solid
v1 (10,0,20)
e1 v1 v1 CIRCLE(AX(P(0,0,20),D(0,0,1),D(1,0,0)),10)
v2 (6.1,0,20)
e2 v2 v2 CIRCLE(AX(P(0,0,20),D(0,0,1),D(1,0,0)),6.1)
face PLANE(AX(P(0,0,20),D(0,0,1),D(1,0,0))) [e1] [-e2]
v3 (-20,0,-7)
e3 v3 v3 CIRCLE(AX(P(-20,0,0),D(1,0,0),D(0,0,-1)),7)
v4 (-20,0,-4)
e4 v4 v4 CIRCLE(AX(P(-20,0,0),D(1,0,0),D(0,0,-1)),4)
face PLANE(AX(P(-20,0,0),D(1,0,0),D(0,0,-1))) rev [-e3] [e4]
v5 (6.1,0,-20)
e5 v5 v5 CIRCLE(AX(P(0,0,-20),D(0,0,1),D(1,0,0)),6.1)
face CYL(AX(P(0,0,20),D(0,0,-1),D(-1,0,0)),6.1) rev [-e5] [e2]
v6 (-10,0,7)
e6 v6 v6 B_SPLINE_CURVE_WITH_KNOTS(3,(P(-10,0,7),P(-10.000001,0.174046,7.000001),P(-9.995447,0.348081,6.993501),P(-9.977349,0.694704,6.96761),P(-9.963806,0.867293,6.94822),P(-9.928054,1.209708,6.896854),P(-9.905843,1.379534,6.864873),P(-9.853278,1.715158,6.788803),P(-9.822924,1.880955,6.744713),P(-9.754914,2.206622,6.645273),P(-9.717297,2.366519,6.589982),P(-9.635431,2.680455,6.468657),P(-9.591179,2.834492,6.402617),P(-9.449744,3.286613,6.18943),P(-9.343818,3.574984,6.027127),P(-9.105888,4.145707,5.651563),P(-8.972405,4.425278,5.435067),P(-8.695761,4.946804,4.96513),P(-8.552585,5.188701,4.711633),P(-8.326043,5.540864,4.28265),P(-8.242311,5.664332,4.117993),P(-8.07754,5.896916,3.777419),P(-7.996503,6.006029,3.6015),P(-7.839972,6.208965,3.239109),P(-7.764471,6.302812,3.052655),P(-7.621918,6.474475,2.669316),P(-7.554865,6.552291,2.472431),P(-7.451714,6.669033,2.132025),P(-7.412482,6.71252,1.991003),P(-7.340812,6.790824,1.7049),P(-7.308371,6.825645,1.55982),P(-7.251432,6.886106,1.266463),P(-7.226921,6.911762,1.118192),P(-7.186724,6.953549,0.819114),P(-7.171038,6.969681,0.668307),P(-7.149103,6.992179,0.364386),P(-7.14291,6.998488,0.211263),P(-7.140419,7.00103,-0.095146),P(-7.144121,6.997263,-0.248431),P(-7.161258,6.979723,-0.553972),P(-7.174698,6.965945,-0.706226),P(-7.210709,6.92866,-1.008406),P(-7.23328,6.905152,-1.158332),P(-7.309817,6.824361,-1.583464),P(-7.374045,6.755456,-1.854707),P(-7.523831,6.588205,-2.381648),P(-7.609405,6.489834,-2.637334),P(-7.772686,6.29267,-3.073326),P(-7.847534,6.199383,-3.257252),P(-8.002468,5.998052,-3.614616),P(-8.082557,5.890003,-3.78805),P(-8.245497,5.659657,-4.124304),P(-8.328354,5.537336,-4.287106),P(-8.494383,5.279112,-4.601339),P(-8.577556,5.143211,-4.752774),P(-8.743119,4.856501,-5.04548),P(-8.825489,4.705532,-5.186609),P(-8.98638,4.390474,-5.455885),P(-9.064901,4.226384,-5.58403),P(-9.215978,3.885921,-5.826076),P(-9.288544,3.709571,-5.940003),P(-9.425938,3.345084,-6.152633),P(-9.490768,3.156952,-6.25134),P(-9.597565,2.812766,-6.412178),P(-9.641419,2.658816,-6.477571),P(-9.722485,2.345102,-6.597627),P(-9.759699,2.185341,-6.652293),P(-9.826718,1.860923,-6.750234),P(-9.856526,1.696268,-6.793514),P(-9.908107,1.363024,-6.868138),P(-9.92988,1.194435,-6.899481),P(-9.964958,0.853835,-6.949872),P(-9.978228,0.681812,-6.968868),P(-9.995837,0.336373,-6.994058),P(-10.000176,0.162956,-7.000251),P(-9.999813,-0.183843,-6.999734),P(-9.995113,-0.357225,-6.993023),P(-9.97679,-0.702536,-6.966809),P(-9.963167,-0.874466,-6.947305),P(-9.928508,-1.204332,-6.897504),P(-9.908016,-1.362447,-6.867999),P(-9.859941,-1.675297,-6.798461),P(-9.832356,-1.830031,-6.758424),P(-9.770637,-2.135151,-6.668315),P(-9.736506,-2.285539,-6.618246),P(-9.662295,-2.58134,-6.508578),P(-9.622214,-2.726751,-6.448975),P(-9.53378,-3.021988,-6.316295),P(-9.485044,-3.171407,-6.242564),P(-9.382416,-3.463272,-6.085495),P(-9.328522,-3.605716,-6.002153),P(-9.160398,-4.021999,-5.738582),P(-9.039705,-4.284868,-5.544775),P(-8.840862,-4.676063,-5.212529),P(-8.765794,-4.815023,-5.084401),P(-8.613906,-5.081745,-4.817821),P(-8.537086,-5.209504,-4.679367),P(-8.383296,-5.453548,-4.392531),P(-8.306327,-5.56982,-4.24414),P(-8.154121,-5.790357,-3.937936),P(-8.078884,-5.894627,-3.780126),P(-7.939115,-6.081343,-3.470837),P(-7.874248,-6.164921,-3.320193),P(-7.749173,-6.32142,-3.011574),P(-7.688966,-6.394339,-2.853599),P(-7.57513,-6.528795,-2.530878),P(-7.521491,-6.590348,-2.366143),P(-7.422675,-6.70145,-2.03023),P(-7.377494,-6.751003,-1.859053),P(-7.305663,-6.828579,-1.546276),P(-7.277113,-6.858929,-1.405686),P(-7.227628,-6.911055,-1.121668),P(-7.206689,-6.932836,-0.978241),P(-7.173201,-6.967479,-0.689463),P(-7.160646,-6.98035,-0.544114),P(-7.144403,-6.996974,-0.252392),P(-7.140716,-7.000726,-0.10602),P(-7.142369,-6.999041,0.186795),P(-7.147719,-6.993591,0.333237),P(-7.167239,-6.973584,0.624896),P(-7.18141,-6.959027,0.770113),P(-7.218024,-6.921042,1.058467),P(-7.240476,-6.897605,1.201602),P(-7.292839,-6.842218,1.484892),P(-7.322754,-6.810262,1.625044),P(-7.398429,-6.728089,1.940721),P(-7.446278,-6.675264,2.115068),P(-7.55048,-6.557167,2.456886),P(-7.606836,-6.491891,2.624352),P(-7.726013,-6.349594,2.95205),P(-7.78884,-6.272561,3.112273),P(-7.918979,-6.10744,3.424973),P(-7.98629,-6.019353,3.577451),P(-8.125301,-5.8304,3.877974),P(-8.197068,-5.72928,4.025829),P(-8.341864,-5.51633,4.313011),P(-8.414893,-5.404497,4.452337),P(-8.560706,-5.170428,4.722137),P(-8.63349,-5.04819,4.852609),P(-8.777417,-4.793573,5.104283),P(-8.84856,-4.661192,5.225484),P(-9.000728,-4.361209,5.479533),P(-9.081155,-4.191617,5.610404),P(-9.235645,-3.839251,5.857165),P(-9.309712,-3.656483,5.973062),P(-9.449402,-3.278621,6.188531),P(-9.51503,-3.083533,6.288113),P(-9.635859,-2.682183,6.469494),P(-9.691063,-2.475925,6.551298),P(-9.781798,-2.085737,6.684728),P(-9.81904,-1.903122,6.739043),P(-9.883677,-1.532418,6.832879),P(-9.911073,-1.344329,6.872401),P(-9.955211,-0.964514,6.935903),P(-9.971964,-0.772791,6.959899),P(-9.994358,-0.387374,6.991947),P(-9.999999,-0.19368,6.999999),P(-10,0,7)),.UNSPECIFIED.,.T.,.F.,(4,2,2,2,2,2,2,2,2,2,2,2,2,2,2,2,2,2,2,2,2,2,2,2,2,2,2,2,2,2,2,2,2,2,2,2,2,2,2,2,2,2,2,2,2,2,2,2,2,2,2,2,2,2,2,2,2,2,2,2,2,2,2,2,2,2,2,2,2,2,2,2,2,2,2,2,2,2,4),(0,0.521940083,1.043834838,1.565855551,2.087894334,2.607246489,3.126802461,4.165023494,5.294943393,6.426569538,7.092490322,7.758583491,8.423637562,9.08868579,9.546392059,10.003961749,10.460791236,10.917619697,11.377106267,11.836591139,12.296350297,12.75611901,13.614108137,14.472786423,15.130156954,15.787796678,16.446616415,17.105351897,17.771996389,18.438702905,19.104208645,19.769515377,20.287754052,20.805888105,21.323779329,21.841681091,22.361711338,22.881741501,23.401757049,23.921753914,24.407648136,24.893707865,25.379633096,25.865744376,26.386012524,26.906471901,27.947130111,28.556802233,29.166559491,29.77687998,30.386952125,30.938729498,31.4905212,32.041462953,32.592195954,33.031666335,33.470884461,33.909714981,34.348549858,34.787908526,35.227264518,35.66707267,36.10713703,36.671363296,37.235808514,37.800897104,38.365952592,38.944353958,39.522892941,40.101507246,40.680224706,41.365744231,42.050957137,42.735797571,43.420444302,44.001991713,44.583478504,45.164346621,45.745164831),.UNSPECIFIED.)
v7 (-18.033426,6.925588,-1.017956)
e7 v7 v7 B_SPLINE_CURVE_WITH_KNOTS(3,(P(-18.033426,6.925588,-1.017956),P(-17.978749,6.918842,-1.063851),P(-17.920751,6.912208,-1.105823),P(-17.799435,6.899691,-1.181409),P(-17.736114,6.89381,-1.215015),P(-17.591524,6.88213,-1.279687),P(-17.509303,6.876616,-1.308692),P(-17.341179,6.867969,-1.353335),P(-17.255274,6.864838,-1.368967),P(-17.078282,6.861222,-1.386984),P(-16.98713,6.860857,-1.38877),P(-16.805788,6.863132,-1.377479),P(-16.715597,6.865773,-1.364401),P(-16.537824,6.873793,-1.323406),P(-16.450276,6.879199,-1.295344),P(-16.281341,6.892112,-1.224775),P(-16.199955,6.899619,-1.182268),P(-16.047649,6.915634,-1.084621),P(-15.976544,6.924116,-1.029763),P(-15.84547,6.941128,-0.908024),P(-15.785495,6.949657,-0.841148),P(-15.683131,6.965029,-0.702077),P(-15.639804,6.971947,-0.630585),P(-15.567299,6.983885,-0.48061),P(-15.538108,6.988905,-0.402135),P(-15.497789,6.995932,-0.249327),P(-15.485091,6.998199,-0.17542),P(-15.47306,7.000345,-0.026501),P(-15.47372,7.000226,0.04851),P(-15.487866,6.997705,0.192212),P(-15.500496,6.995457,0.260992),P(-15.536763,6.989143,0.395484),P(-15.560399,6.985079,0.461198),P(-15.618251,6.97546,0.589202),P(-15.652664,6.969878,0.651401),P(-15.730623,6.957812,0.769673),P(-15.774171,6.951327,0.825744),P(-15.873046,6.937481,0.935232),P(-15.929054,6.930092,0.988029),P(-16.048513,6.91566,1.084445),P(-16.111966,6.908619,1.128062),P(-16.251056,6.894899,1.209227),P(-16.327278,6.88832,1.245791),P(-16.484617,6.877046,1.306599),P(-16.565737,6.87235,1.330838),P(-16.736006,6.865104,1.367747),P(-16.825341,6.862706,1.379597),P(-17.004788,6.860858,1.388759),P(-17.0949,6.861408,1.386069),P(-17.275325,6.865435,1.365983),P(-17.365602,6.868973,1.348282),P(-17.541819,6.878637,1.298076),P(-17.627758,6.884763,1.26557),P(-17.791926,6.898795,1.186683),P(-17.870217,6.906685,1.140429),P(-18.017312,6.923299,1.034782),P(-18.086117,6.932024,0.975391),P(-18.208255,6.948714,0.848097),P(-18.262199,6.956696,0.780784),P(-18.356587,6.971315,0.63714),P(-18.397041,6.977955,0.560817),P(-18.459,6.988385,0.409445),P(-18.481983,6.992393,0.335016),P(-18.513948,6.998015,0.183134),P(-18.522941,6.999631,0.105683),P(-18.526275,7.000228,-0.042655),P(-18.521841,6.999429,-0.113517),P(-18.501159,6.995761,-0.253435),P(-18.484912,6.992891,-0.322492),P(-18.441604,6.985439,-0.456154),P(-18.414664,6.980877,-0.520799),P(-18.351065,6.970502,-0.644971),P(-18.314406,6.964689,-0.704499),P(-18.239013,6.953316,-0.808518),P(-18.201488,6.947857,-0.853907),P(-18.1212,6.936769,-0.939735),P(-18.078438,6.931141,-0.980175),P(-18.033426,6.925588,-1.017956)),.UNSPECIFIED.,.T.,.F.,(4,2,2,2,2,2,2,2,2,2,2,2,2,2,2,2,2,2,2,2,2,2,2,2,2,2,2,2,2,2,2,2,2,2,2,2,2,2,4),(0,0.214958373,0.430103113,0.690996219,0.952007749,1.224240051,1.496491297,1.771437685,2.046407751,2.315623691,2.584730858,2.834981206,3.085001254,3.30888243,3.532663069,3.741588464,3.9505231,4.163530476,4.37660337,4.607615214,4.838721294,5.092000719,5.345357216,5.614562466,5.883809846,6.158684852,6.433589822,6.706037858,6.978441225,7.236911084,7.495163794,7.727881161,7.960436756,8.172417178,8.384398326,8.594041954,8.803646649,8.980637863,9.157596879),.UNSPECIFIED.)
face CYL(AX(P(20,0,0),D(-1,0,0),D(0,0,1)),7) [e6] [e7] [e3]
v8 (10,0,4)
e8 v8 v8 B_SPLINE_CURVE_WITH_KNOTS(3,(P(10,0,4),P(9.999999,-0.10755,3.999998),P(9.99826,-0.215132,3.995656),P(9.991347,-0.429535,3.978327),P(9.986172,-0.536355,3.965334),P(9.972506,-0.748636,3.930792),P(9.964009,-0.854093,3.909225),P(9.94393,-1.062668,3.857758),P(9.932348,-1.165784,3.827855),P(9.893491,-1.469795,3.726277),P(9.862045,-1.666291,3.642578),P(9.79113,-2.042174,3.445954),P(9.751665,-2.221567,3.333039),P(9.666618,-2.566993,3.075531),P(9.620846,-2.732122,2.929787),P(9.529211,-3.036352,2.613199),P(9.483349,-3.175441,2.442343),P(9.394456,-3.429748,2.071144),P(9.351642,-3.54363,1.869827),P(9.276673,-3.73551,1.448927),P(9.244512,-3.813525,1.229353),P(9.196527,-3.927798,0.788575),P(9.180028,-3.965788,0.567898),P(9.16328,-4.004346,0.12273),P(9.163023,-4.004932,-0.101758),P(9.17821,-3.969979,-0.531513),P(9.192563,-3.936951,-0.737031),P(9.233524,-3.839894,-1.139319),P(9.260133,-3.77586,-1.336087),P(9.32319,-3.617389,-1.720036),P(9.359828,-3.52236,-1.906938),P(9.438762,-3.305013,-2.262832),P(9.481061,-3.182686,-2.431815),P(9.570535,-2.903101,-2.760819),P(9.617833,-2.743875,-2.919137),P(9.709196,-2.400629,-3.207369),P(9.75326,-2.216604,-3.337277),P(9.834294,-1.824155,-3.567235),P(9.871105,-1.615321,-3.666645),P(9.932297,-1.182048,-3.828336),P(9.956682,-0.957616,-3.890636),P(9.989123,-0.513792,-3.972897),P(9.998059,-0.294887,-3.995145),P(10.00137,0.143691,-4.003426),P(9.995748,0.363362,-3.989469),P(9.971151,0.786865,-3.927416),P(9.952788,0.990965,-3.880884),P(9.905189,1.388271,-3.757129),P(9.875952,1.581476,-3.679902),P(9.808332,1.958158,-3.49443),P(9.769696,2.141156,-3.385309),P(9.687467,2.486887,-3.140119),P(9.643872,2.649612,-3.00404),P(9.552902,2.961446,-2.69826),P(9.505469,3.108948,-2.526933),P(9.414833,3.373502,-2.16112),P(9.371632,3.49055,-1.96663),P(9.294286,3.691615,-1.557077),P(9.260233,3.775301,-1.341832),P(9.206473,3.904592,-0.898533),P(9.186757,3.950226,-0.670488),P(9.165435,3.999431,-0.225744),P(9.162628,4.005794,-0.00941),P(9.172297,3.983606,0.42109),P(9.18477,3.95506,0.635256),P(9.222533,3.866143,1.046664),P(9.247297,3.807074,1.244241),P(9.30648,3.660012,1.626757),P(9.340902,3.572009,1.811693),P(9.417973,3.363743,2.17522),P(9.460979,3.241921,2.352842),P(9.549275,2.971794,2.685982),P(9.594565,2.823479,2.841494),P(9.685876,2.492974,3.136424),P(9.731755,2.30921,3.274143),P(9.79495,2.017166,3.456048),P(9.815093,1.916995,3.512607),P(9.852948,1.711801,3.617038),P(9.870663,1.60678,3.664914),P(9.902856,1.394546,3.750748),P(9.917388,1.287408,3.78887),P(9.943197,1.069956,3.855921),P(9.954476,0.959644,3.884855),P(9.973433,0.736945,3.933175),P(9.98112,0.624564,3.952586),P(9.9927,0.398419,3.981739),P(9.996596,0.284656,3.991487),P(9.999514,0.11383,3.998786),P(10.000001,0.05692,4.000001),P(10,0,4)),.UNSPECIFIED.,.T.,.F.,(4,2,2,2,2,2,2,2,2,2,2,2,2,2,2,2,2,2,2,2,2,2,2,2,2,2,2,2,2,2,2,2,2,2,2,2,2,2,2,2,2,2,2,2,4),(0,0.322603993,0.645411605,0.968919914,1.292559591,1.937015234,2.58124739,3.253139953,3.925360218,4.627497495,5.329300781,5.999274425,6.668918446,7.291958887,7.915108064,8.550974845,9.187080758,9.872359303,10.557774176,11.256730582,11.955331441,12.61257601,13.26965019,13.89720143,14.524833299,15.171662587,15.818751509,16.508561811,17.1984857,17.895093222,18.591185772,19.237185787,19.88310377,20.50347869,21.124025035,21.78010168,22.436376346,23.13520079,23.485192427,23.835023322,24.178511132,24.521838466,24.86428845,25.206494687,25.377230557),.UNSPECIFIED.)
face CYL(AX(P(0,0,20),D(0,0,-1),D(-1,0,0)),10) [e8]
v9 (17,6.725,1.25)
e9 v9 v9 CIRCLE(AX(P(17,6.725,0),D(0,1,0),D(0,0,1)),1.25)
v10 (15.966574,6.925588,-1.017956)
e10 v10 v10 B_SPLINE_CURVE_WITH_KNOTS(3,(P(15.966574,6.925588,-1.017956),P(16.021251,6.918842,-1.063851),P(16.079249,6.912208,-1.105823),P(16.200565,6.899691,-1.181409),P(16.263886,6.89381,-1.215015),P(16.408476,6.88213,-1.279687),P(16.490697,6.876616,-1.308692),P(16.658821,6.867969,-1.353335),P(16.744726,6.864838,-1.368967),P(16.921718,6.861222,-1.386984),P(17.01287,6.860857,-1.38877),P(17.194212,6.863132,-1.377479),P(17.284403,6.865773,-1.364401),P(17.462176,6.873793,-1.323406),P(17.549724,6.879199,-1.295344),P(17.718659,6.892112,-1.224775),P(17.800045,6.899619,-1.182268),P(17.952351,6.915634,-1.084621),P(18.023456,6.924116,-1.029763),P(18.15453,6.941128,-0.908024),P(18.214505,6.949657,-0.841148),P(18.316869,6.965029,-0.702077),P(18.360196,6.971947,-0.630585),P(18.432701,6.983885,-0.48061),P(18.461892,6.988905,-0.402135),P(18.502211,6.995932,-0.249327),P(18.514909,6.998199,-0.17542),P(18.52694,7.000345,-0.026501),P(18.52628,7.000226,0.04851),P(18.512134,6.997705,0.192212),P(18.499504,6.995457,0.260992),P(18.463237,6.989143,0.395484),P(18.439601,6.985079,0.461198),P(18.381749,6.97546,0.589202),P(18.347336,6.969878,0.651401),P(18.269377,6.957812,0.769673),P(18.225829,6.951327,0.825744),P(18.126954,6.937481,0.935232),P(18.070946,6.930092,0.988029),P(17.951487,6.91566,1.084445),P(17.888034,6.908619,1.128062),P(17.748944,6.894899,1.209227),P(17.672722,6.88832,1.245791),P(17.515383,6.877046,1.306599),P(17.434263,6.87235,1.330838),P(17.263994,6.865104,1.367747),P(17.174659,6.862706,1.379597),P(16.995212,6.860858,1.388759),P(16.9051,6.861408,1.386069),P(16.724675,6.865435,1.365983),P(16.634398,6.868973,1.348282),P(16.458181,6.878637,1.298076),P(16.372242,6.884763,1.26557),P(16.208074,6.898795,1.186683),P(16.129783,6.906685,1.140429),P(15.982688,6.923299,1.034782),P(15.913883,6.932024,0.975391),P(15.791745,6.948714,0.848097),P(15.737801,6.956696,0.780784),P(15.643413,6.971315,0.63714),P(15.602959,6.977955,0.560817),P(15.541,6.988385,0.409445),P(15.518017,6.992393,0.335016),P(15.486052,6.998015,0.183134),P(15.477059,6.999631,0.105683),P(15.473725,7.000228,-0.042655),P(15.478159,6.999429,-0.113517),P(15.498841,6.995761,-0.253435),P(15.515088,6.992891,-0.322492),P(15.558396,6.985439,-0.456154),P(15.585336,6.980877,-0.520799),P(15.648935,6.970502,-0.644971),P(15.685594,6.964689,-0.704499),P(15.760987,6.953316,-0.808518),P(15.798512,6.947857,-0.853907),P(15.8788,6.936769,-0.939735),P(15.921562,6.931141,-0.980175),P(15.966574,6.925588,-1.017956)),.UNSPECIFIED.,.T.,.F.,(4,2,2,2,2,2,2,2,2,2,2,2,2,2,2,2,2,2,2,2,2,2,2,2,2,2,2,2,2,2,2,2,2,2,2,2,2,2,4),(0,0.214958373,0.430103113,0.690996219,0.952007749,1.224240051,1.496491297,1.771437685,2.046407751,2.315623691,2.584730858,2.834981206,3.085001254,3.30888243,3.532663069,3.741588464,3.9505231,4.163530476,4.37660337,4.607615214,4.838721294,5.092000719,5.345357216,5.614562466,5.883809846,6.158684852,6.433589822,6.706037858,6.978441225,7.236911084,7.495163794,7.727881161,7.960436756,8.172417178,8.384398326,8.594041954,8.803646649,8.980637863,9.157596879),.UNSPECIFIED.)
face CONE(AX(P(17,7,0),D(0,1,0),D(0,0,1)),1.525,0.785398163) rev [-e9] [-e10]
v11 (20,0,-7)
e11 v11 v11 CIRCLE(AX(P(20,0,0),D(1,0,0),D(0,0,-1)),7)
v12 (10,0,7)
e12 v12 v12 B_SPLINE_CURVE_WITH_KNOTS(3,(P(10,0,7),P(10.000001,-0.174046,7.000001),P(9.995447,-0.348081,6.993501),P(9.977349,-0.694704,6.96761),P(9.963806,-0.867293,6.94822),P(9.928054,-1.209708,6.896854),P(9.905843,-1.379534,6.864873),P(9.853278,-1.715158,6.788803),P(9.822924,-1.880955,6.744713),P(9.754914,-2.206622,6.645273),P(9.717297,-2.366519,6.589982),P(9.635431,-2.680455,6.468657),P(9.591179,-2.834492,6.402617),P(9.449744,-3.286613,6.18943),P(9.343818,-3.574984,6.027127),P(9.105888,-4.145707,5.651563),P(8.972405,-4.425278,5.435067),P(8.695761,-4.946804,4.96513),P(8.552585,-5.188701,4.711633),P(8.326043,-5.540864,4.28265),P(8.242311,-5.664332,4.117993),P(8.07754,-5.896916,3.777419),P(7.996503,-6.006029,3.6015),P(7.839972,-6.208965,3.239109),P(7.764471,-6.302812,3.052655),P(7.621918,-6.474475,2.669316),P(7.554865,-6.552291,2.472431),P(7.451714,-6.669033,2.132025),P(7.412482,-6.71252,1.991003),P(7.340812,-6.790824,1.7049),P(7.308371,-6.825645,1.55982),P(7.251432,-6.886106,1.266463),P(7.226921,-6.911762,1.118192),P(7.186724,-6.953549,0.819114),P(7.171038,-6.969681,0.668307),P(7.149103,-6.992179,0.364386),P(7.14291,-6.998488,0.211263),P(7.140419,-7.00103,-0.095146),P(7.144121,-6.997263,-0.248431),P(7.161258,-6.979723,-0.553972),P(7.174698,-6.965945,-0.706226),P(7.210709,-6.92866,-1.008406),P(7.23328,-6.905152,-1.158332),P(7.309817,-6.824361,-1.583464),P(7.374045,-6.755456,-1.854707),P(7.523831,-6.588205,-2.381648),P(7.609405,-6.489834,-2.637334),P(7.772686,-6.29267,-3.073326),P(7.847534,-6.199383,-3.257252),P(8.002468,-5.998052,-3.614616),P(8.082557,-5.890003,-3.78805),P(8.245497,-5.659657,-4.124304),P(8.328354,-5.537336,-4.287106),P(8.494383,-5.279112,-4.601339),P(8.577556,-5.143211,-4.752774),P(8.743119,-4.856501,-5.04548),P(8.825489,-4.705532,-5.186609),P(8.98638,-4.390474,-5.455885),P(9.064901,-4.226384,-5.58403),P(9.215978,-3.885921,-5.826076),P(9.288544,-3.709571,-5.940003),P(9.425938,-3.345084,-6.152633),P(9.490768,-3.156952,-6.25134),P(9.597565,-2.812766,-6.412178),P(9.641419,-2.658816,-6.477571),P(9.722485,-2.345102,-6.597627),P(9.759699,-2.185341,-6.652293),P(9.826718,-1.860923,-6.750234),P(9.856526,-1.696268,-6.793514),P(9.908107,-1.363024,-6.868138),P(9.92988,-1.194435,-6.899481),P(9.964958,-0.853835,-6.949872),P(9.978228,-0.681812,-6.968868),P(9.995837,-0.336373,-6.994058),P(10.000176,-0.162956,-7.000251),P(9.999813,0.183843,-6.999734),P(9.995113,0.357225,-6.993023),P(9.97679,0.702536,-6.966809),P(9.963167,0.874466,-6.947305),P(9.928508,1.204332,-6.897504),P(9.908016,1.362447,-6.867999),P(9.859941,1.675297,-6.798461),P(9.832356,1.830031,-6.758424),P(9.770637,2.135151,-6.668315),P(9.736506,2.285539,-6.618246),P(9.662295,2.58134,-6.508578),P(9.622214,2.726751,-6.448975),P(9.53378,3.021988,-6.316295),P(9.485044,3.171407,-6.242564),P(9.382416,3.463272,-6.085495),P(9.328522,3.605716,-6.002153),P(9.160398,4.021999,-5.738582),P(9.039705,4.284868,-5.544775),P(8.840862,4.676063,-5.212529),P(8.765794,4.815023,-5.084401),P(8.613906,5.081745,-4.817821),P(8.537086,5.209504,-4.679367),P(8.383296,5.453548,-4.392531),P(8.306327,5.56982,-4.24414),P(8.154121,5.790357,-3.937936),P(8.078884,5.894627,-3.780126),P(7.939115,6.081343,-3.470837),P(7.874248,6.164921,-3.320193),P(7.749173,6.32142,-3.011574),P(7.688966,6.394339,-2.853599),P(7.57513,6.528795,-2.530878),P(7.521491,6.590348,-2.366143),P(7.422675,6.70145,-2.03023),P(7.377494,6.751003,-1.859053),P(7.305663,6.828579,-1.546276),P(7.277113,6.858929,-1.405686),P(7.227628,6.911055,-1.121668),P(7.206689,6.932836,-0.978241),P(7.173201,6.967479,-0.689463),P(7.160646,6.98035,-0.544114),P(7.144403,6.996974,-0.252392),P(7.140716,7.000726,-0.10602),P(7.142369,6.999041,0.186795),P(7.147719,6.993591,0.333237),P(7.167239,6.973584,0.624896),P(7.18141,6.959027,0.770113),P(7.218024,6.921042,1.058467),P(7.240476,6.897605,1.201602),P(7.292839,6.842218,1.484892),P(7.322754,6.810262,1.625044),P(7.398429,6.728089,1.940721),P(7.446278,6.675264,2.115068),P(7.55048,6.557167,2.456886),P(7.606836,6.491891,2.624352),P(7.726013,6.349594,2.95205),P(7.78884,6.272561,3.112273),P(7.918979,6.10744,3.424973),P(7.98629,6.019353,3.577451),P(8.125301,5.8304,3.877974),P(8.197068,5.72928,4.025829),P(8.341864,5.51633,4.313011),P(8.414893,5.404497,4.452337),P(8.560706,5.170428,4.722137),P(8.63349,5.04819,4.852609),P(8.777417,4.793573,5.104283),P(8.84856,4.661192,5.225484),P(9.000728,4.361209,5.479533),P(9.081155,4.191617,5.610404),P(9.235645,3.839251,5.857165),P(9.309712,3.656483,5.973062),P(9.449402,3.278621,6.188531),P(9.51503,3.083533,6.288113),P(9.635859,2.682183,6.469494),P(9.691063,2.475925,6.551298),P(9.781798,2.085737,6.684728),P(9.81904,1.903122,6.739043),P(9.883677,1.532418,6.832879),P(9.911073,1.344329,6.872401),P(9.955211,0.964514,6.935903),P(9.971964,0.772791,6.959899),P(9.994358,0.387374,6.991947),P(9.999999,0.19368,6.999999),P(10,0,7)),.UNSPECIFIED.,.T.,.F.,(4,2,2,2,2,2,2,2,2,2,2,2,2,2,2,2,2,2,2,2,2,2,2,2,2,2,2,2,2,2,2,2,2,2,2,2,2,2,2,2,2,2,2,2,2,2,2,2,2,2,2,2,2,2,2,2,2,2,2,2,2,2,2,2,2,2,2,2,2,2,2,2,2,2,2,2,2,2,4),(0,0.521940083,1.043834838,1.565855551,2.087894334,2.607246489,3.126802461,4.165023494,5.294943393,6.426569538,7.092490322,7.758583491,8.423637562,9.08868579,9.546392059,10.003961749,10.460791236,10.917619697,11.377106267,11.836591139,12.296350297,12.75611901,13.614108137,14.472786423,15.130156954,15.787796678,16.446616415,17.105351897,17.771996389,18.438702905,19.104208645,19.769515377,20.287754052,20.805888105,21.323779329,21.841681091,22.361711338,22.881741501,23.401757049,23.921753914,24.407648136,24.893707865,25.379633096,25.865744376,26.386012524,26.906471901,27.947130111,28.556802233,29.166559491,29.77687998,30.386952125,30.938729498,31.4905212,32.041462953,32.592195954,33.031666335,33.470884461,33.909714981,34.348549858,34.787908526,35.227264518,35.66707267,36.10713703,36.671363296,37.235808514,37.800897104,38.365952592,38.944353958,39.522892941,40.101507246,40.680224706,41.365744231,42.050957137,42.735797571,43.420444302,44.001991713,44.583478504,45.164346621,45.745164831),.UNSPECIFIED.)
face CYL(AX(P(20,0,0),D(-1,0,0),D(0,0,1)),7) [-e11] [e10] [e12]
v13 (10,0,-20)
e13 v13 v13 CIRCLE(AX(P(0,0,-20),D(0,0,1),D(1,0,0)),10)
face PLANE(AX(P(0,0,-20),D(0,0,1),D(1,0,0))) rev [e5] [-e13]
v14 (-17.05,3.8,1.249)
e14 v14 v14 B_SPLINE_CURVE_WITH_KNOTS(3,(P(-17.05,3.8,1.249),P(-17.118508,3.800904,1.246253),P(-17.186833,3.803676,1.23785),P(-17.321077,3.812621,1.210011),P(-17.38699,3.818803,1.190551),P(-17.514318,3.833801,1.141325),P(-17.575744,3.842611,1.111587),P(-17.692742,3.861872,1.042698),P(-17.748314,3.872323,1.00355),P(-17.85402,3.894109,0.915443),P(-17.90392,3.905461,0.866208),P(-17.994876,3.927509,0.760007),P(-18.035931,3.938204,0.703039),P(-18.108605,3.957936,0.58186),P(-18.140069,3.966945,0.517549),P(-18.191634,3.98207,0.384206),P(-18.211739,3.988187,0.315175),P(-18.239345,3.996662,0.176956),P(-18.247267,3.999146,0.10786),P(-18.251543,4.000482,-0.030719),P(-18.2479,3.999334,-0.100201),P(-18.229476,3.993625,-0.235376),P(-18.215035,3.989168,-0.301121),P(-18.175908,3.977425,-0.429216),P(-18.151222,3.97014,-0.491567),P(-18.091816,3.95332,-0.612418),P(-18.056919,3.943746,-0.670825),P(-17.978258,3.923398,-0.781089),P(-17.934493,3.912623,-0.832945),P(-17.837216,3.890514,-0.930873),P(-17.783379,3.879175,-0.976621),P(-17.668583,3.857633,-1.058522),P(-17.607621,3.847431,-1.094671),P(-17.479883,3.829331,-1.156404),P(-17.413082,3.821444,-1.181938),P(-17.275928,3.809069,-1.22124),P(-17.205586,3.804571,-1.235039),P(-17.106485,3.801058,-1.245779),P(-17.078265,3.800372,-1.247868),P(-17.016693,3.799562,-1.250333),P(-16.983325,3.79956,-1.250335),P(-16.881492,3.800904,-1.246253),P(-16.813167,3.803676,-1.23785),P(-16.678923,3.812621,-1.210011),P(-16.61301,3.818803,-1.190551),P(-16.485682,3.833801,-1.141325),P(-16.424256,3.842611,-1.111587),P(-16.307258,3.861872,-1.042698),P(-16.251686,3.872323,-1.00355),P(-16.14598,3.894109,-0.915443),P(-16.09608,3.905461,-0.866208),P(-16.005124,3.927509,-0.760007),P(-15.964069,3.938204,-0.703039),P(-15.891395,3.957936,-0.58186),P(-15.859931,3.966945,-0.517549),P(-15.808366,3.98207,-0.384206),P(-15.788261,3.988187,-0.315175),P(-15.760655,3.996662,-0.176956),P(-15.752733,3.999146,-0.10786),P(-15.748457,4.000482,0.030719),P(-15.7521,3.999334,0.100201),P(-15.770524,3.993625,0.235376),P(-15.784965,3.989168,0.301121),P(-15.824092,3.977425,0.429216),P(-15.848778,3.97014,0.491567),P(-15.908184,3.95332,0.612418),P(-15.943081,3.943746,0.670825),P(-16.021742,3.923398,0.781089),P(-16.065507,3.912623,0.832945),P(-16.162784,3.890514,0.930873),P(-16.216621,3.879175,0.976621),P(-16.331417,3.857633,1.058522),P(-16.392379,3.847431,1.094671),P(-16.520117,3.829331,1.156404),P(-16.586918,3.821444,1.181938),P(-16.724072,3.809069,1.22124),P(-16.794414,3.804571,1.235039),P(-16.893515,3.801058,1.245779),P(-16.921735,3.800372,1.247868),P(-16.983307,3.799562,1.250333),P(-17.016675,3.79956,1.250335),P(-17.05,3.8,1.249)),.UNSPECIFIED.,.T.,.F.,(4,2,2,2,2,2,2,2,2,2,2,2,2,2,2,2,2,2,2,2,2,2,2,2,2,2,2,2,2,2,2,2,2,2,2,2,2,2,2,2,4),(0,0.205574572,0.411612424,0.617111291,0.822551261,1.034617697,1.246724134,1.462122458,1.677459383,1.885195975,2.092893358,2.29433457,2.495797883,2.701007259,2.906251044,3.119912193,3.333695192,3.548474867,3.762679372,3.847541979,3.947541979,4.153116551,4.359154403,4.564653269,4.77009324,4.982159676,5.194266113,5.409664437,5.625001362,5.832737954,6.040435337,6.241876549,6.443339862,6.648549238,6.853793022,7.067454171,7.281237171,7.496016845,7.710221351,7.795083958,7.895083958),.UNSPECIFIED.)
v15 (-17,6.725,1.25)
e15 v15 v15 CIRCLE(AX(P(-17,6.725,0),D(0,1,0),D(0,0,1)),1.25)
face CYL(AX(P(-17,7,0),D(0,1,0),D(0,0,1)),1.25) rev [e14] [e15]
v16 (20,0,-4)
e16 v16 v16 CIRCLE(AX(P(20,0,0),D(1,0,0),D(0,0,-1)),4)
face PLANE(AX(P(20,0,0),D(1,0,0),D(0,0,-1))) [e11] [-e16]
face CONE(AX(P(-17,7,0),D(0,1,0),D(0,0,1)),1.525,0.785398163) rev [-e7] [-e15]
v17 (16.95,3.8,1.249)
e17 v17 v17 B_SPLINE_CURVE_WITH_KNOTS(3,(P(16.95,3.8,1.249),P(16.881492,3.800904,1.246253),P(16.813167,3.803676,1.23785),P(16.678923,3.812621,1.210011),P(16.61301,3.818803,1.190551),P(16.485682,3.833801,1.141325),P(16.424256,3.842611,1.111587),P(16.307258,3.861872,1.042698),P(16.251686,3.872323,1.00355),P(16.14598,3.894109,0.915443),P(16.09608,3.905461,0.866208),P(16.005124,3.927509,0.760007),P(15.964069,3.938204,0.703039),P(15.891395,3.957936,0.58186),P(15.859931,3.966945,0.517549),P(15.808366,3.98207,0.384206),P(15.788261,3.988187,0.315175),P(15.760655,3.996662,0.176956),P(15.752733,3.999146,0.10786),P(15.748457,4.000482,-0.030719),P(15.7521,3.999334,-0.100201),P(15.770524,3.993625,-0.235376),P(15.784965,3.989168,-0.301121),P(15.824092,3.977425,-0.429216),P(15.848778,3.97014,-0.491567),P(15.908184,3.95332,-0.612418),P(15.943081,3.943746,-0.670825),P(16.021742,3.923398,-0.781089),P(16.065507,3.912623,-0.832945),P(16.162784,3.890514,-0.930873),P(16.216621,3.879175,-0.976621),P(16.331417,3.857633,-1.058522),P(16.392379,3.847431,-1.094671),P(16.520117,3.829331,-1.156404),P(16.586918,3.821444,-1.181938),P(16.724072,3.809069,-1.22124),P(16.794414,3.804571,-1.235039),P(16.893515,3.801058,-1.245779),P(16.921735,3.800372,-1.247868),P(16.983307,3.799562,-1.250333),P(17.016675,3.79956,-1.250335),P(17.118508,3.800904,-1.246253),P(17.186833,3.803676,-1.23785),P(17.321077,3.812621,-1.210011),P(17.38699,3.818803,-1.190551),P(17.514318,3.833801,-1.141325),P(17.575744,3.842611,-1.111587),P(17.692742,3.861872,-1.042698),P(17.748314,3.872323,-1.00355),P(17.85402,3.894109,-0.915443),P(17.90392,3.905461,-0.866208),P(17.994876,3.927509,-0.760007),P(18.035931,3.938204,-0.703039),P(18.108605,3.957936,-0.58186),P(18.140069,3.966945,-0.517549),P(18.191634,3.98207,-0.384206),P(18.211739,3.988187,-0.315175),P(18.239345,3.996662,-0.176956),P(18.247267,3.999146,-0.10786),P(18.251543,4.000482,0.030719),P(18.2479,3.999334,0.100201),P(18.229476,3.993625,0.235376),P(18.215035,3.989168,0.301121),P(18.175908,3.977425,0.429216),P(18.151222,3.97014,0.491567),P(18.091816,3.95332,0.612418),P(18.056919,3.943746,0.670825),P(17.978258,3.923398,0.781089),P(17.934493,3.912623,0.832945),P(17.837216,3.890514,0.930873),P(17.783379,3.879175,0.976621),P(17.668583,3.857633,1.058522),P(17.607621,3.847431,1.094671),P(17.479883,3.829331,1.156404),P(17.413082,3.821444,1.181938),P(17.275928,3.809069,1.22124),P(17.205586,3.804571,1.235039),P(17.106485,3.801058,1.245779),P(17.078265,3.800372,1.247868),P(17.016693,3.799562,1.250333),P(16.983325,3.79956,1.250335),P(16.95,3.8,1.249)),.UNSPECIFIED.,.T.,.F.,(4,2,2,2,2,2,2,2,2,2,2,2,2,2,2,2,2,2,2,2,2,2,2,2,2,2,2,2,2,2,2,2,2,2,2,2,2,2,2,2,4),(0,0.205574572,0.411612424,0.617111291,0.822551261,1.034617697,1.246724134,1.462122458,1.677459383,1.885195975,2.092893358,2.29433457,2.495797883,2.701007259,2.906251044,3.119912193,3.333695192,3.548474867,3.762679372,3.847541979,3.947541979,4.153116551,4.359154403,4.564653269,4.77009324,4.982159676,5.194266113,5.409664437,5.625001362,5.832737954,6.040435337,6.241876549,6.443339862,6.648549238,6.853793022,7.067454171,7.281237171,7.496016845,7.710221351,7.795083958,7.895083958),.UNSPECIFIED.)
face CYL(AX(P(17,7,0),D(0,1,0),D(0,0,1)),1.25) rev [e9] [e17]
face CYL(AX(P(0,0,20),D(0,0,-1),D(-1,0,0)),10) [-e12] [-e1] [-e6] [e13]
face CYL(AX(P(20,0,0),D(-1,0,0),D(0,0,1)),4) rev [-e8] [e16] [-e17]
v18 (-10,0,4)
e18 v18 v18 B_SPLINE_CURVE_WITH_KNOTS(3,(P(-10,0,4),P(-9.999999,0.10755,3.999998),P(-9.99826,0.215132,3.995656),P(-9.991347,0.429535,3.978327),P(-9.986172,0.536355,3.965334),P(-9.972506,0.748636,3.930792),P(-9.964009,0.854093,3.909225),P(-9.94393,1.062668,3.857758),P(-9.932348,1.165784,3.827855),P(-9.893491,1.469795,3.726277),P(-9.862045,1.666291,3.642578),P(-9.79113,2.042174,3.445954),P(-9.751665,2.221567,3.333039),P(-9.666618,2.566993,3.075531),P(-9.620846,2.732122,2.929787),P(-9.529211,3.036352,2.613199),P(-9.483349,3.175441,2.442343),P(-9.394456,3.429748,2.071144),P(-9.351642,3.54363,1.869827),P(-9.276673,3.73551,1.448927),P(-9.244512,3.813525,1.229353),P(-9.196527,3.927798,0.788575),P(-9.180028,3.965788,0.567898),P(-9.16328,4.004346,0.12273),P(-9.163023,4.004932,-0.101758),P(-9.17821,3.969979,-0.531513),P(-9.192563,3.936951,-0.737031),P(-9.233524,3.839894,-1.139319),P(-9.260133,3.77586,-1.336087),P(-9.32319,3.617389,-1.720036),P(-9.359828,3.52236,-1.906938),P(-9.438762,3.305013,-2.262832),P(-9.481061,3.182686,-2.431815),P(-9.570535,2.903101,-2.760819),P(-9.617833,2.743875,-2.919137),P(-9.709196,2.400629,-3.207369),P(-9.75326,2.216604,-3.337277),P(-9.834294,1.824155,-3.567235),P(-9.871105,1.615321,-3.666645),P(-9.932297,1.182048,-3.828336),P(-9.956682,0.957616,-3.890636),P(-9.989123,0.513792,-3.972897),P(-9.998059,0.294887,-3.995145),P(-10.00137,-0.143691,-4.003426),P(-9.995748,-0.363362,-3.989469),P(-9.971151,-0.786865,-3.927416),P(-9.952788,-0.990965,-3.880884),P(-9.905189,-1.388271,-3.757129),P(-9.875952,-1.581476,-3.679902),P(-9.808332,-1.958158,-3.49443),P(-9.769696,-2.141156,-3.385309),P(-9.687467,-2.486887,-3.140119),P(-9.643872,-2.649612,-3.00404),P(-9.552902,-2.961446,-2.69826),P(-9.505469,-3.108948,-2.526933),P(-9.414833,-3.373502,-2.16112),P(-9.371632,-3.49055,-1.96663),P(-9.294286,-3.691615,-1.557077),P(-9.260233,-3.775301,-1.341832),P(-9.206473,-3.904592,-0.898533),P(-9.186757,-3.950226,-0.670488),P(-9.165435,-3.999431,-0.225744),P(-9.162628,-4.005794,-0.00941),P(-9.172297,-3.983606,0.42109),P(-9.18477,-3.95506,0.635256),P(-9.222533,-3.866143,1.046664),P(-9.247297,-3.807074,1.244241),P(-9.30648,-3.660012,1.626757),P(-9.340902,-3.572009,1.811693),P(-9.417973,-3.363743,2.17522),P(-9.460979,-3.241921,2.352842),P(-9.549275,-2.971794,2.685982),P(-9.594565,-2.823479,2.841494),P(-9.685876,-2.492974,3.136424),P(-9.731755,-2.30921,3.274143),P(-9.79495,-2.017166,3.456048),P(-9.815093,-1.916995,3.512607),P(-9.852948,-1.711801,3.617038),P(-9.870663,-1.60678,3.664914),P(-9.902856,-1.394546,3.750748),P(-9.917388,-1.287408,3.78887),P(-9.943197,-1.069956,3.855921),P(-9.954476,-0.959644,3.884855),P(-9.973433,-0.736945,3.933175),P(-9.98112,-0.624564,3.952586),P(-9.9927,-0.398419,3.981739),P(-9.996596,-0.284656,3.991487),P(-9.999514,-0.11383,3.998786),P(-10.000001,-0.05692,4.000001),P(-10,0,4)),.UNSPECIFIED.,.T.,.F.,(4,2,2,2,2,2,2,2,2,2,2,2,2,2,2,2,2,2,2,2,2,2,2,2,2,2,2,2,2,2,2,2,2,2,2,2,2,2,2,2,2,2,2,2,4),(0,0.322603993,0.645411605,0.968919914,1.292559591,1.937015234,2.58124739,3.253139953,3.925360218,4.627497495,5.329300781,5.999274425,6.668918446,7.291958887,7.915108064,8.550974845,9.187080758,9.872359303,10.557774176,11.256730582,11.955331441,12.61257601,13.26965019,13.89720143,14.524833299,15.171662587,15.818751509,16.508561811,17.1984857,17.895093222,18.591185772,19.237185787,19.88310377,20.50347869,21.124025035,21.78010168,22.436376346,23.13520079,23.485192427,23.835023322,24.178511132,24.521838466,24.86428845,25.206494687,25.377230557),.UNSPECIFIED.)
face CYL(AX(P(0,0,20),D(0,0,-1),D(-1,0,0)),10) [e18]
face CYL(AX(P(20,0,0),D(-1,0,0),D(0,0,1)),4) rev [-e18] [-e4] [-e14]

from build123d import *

# Parameters (mm, degrees)
SKETCH1_R               = 10
SKETCH1_R_2             = 6.1
BOSS_EXTRUDE1_DEPTH     = 20
SKETCH2_R               = 7
SKETCH2_R_2             = 4
BOSS_EXTRUDE2_DEPTH     = 20
CUT_EXTRUDE1_DEPTH      = 31.000000167
CUT_EXTRUDE1_DEPTH_BACK = 31.000000167
SKETCH5_R               = 6.1


# Read off the part's stored shape, not the designer's step: M3 Tapped Hole1
with BuildPart() as part:
    # Sketch1 → Boss-Extrude1 (new, symmetric)
    with BuildSketch(Plane.XY):
        Circle(SKETCH1_R)
        Circle(SKETCH1_R_2, mode=Mode.SUBTRACT)
    extrude(amount=BOSS_EXTRUDE1_DEPTH, both=True)

    # Sketch2 → Boss-Extrude2 (add, symmetric)
    with BuildSketch(Plane(origin=(0, 0, 0), x_dir=(0, 0, -1), z_dir=(1, 0, 0))):
        Circle(SKETCH2_R)
        with Locations(Location((0, 0, 0), (0, 0, 180))):
            Circle(SKETCH2_R_2, mode=Mode.SUBTRACT)
    extrude(amount=BOSS_EXTRUDE2_DEPTH, both=True)

    # M3 Tapped Hole1 outline → M3 Tapped Hole1 (revolve, cut)
    with BuildSketch(Plane(origin=(17, 0, 0), x_dir=(1, 0, 0), z_dir=(0, 0, 1))):
        Polygon((1.525056823, 7.000056823), (0, 7.000056823), (0, 3.799585789), (1.25, 3.799585789), (1.25, 6.725), align=None)
    revolve(axis=Axis((17, 0, 0), (0, 1, 0)), mode=Mode.SUBTRACT)

    # M3 Tapped Hole1 2 outline → M3 Tapped Hole1 2 (revolve, cut)
    with BuildSketch(Plane(origin=(-17, 0, 0), x_dir=(1, 0, 0), z_dir=(0, 0, 1))):
        Polygon((1.525056823, 7.000056823), (0, 7.000056823), (0, 3.799585789), (1.25, 3.799585789), (1.25, 6.725), align=None)
    revolve(axis=Axis((-17, 0, 0), (0, 1, 0)), mode=Mode.SUBTRACT)

    # Sketch5 → Cut-Extrude1 (cut, two sides: drawn at the far end of the back side and taken through both)
    with BuildSketch(Plane.XY.offset(-CUT_EXTRUDE1_DEPTH_BACK)):
        Circle(SKETCH5_R)
    extrude(amount=CUT_EXTRUDE1_DEPTH + CUT_EXTRUDE1_DEPTH_BACK, mode=Mode.SUBTRACT)


solid = part.part
